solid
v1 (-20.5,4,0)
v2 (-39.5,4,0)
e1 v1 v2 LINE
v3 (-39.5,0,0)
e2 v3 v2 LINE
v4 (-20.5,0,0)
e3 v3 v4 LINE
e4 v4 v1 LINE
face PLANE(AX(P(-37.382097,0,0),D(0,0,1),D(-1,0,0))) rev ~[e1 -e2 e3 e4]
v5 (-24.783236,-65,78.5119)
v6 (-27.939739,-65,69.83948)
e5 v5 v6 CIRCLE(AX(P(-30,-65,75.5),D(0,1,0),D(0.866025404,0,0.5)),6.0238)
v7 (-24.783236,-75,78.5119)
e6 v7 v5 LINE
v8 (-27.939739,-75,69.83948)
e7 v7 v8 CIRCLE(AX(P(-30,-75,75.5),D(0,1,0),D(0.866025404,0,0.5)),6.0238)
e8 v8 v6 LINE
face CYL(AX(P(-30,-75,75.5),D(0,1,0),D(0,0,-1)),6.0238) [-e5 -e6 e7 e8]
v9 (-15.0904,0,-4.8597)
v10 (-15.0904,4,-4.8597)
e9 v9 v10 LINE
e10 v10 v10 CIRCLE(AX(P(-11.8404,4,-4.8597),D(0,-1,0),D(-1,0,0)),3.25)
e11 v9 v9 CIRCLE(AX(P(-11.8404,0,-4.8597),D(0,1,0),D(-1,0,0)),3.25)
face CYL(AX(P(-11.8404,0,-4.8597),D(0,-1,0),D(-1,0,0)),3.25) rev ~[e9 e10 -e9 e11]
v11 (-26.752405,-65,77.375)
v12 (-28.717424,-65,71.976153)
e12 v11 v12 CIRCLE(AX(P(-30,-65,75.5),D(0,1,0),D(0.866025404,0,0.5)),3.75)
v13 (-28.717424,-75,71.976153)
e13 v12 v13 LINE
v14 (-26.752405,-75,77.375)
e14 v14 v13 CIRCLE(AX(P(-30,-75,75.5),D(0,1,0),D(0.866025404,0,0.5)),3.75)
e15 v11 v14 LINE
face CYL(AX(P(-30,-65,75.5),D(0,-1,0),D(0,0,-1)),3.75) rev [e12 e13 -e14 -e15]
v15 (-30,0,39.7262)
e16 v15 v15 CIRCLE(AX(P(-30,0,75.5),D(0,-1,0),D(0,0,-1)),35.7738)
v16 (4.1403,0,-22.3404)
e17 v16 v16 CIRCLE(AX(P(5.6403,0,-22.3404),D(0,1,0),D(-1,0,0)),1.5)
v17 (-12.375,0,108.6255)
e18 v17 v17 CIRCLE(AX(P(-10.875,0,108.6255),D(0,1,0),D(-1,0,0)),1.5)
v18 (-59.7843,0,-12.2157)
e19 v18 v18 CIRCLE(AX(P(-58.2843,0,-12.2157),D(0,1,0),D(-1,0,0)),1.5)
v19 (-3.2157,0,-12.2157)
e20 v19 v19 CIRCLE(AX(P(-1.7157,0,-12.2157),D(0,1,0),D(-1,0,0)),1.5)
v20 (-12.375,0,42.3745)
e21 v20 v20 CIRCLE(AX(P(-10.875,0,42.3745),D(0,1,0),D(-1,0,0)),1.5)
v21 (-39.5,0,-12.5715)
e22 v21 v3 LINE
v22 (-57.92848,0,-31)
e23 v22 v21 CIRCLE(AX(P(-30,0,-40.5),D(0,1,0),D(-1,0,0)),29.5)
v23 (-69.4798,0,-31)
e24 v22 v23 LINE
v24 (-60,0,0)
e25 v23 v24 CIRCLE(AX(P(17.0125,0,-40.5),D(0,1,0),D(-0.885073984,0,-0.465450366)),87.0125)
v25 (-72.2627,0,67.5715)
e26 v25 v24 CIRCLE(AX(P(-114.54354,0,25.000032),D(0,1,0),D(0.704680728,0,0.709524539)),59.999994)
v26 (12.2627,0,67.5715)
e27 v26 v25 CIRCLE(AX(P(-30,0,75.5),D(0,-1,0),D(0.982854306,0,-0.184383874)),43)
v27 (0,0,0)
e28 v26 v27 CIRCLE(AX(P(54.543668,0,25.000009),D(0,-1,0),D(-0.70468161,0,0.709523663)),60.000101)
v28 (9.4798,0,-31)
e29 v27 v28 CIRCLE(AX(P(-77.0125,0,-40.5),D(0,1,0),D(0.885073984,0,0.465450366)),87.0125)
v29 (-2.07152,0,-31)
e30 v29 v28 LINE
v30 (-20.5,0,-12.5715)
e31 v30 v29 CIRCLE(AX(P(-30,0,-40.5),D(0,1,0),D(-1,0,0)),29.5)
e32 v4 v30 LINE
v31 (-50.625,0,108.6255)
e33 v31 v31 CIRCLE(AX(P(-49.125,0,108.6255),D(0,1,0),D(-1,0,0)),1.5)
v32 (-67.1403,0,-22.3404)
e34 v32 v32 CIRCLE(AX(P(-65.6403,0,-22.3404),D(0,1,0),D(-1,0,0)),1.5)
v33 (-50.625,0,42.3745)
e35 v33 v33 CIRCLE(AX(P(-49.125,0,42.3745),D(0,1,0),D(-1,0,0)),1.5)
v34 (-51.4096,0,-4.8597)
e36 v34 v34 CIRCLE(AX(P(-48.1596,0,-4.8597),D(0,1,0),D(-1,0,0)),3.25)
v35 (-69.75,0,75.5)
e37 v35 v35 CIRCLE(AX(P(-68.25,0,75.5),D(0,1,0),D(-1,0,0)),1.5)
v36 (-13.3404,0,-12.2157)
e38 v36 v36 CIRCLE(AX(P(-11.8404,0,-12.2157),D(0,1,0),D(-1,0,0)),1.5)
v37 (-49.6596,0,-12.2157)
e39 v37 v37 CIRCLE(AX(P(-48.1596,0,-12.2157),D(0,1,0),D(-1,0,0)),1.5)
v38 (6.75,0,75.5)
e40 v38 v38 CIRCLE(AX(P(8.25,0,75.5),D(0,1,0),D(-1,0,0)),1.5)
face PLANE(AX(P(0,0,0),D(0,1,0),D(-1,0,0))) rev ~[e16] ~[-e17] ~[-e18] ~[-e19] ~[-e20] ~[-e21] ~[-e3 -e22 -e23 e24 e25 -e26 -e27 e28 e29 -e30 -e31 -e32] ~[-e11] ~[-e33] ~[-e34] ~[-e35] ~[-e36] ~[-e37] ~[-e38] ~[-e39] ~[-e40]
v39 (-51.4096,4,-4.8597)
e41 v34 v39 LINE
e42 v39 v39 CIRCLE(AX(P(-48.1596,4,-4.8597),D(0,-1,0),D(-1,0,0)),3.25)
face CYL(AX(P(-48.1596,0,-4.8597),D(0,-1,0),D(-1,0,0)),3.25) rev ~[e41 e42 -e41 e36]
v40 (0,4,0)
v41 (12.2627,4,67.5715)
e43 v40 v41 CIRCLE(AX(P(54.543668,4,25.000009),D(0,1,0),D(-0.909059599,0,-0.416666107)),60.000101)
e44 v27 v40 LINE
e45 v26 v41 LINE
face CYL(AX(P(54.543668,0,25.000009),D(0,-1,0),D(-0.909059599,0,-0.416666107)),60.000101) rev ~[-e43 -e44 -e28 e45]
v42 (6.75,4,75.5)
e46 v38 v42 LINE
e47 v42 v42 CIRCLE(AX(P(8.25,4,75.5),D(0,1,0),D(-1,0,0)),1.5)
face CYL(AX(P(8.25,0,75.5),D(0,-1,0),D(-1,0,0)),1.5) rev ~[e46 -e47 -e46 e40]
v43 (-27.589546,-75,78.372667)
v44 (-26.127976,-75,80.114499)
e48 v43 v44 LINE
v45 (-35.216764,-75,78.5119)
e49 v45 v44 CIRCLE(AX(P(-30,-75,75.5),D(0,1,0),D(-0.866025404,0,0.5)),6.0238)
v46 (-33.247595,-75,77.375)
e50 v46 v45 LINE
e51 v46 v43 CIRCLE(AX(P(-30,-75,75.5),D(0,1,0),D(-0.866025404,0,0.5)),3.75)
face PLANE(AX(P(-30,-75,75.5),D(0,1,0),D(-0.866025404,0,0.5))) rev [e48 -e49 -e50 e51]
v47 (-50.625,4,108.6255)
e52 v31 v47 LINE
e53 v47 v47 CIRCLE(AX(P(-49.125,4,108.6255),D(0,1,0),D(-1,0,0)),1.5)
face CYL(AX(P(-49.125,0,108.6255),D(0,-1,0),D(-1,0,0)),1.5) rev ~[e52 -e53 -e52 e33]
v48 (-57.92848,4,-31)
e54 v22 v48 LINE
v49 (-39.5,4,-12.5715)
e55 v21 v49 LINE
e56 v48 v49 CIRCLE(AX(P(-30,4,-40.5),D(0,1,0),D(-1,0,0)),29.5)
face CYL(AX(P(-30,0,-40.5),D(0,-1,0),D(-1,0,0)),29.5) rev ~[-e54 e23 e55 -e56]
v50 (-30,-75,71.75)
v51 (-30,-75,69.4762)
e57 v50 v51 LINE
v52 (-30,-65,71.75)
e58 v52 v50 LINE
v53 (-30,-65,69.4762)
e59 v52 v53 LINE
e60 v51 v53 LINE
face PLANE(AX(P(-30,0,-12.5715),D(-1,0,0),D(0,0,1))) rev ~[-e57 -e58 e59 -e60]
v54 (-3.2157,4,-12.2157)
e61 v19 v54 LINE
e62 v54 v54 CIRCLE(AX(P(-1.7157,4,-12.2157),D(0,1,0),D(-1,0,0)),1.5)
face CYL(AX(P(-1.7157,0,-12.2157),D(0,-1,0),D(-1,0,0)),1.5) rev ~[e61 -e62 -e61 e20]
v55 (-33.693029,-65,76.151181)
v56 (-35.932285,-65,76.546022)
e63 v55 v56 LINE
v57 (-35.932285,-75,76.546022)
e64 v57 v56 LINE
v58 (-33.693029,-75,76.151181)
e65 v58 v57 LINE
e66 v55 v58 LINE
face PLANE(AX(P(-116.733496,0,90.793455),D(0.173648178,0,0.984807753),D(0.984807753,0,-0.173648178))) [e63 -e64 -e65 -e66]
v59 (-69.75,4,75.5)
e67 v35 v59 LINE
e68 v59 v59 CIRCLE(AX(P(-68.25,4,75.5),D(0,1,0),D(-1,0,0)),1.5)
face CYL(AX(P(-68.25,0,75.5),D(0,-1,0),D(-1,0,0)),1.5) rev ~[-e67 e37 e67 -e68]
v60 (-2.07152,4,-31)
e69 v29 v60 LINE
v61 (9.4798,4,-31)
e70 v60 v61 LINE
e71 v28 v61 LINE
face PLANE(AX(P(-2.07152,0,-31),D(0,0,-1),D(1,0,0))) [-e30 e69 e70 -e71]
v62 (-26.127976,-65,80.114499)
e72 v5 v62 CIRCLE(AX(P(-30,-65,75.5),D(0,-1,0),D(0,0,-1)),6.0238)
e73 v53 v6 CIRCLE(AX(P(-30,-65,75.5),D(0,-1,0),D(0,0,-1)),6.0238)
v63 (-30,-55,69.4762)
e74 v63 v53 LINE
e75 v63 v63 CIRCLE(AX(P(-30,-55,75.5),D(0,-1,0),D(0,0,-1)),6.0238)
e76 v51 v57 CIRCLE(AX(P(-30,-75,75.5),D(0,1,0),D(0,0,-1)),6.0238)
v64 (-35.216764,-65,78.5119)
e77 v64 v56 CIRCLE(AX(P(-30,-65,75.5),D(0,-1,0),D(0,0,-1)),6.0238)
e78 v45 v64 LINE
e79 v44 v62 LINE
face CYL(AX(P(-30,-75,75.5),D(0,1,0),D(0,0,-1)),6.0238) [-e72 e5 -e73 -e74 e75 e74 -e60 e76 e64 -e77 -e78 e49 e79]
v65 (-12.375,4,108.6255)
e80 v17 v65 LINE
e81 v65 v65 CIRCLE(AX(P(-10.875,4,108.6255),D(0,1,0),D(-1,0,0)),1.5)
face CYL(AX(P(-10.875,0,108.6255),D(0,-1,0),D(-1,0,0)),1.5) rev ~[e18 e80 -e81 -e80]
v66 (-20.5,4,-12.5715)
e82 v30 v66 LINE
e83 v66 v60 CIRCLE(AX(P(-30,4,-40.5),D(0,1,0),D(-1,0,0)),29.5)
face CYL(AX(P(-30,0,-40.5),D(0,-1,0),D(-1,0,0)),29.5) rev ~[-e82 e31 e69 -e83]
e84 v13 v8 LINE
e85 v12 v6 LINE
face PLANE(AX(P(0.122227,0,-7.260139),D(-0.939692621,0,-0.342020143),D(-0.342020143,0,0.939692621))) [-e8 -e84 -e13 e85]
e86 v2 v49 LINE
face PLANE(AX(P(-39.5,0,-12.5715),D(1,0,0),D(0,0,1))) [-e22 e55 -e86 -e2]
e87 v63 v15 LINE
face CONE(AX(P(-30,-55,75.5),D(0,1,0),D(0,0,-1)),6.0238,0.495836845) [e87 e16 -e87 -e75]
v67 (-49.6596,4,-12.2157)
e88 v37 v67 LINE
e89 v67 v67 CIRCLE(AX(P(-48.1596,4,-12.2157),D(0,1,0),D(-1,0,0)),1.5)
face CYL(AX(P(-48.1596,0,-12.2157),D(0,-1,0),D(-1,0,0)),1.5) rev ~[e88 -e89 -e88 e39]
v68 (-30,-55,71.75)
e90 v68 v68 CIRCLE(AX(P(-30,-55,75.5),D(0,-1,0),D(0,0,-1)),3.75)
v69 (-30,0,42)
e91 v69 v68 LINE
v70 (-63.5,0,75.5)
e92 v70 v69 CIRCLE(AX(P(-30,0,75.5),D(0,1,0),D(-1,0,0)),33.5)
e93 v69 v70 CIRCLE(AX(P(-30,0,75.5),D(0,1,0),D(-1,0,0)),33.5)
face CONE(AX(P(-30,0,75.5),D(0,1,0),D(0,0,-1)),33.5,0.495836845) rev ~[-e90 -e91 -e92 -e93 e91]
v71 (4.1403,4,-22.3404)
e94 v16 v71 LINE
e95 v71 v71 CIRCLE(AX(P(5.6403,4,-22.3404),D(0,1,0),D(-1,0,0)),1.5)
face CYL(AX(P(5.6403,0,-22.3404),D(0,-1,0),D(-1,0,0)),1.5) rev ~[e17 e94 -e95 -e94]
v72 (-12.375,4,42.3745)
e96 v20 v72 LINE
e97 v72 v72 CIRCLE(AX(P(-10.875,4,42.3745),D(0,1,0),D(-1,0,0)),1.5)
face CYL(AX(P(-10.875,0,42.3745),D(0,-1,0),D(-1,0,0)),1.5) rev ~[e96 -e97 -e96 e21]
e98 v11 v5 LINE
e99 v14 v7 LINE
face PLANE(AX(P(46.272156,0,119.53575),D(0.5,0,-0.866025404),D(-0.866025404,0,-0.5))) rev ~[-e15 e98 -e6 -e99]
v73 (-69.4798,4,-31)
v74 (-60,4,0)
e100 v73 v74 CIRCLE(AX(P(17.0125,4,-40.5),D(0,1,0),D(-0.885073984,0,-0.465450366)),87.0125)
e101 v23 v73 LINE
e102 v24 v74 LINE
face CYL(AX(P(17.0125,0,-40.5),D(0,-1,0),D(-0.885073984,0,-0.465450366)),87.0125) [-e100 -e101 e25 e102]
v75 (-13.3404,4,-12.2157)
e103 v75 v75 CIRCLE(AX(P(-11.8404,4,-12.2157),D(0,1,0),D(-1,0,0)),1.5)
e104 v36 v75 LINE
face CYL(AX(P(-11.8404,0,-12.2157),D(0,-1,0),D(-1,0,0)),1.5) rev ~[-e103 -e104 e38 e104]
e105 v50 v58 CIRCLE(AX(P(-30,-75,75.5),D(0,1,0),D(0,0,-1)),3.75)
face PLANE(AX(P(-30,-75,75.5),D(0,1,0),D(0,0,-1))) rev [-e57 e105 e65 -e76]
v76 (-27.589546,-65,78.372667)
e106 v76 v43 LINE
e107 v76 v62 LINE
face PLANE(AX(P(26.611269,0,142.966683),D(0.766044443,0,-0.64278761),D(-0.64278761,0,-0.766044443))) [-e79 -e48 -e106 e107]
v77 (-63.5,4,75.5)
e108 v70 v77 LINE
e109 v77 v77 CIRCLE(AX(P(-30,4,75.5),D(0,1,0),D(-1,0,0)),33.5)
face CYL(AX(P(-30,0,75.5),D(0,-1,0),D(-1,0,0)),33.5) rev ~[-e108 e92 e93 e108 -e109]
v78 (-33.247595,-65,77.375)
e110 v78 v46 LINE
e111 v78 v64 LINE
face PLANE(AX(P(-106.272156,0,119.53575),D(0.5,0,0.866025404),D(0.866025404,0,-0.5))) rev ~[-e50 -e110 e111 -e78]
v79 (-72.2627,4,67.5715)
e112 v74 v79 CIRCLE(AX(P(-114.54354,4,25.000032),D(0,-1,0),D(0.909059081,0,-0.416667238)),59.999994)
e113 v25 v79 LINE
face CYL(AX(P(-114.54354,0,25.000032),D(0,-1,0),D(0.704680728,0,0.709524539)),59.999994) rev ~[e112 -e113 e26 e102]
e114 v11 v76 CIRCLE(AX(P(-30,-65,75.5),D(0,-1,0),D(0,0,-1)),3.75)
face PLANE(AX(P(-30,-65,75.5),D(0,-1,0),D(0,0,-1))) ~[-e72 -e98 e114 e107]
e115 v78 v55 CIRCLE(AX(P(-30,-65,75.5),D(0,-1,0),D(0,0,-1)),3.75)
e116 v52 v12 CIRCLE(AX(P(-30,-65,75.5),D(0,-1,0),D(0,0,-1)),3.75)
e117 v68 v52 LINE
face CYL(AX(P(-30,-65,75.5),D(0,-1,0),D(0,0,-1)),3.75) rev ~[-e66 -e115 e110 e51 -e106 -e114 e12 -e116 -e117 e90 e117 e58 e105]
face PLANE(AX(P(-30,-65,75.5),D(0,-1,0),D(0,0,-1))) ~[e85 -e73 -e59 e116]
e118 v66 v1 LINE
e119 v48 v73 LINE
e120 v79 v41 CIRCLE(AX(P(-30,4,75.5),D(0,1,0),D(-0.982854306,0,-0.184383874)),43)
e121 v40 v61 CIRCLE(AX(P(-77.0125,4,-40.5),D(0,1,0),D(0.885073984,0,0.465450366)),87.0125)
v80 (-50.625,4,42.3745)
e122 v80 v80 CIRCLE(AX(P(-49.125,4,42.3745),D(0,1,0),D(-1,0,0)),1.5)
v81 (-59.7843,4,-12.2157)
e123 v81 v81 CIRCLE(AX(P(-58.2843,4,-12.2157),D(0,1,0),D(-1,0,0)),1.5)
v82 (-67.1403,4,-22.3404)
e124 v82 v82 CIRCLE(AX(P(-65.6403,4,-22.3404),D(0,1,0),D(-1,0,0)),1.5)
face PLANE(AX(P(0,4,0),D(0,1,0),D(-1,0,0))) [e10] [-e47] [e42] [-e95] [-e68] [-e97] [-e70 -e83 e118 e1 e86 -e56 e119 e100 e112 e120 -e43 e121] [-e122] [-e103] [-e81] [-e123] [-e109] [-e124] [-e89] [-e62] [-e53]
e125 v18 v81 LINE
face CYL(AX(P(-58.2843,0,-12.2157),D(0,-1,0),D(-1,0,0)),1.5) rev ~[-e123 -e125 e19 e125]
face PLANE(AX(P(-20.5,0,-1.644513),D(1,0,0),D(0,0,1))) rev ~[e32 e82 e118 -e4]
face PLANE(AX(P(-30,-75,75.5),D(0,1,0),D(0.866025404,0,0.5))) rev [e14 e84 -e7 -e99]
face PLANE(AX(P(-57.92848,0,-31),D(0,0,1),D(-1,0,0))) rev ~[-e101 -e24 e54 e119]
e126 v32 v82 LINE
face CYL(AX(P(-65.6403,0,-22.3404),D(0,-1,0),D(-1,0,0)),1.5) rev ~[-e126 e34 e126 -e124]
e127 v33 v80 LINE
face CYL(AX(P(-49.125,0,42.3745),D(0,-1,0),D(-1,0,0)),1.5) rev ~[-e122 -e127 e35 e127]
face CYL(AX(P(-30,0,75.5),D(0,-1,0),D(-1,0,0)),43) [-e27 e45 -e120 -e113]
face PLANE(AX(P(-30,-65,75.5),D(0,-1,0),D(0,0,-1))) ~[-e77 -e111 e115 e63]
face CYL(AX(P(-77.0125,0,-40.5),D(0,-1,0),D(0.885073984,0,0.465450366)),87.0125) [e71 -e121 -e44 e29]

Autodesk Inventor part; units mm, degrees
ref_plane "YZ Plane" through (0, 0, 0) normal (1, 0, 0) x (0, 1, 0)
ref_plane "XZ Plane" through (0, 0, 0) normal (0, 1, 0) x (-1, 0, 0)
ref_plane "XY Plane" through (0, 0, 0) normal (0, 0, 1) x (1, 0, 0)
sketch "Sketch1" plane through (0, 0, 0) normal (0, 1, 0) x (-1, 0, 0)
  line L0 (0, 0) -> (60, 0)
  line L1 (60, -81) -> (0, -81)
  line L2 (0, -81) -> (0, -40.5)
  line L3 (44.9096, -21.5055) -> (14.9096, -21.5055) construction
  line L4 (44.9096, -81) -> (44.9096, 0) construction
  line L5 (14.9096, 0) -> (14.9096, -81) construction
  circle A0 centre (39.9096, -73.5) radius 1.5
  circle A1 centre (39.9096, -7.5) radius 1.5
  circle A2 centre (19.9096, -7.5) radius 1.5
  circle A3 centre (19.9096, -73.5) radius 1.5
  line L6 (60, -40.5) -> (0, -40.5) construction
  line L7 (30, 0) -> (30, -81) construction
  circle A4 centre (30, -40.5) radius 24
  circle A5 centre (30, -40.5) radius 27.5
  circle A6 centre (57.1293, -36) radius 1.5
  circle A7 centre (57.1293, -45) radius 1.5
  circle A8 centre (25.5, -13.3707) radius 1.5
  circle A9 centre (34.5, -13.3707) radius 1.5
  circle A10 centre (2.8707, -45) radius 1.5
  circle A11 centre (2.8707, -36) radius 1.5
  circle A12 centre (34.5, -67.6293) radius 1.5
  circle A13 centre (25.5, -67.6293) radius 1.5
  arc A14 (60, -81) -> (60, 0) centre (-17.0125, -40.5) ccw
  arc A15 (-5.7831, -34.5157) -> (14.9096, -7.5073) centre (30, -40.5) ccw construction
  circle A16 centre (65.9998, -36) radius 1.5
  circle A17 centre (65.9998, -45) radius 1.5
  circle A18 centre (-5.9998, -45) radius 1.5
  circle A19 centre (-5.9998, -36) radius 1.5
  arc A20 (0, 0) -> (0, -81) centre (77.0125, -40.5) ccw
  line L8 (30, -40.5) -> (-3.3536, -73.8536) construction
  circle A21 centre (1.7157, -68.7843) radius 1.5
  circle A22 centre (11.8404, -76.1403) radius 1.5
  circle A23 centre (23.7426, -80.0075) radius 1.5
  circle A24 centre (36.2574, -80.0075) radius 1.5
  circle A25 centre (48.1596, -76.1403) radius 1.5
  circle A26 centre (58.2843, -68.7843) radius 1.5
  circle A27 centre (65.6403, -58.6596) radius 1.5
  circle A28 centre (69.5075, -46.7574) radius 1.5
  circle A29 centre (69.5075, -34.2426) radius 1.5
  circle A30 centre (65.6403, -22.3404) radius 1.5
  circle A31 centre (58.2843, -12.2157) radius 1.5
  circle A32 centre (48.1596, -4.8597) radius 1.5
  circle A33 centre (36.2574, -0.9925) radius 1.5
  circle A34 centre (23.7426, -0.9925) radius 1.5
  circle A35 centre (11.8404, -4.8597) radius 1.5
  circle A36 centre (1.7157, -12.2157) radius 1.5
  circle A37 centre (-5.6403, -22.3404) radius 1.5
  circle A38 centre (-9.5075, -34.2426) radius 1.5
  circle A39 centre (-9.5075, -46.7574) radius 1.5
  circle A40 centre (-5.6403, -58.6596) radius 1.5
  circle A41 centre (48.1596, -68.7843) radius 1.5
  circle A42 centre (48.1596, -12.2157) radius 1.5
  circle A43 centre (11.8404, -12.2157) radius 1.5
  circle A44 centre (11.8404, -68.7843) radius 1.5
  line L9 (56.4575, -33) -> (69.2906, -33)
  line L10 (37.5, -1.2094) -> (37.5, -14.0425)
  line L11 (37.5, -1.2094) -> (37.5, -14.0425)
  circle A45 centre (30, -40.5) radius 27.5
  line L12 (30, -81) -> (30, -0.5) construction
  line L13 (60, -33) -> (60, -81)
  arc A46 (60, -14.0425) -> (59.3249, -13.2961) centre (30, -40.5) ccw construction
  line L14 (55.807, -31) -> (69.4798, -31)
  circle A47 centre (48.1596, -4.8597) radius 3.25
  line L15 (51.4096, -4.8597) -> (51.4096, 0)
  line L16 (44.9096, -4.8597) -> (44.9096, 0)
  circle A48 centre (30, -40.5) radius 29.5
  line L17 (39.5, -12.5715) -> (39.5, 0)
  circle A49 centre (30, 75.5) radius 33.5
  line L18 (148.361, 0) -> (-88.361, 0) projected
  circle A50 centre (30, 75.5) radius 43
  arc A51 (37.7343, -1.2549) -> (13.1894, -4.2039) centre (30, -40.5) ccw
  arc A52 (-9.2451, -32.7657) -> (69.2451, -32.7657) centre (30, -40.5) ccw
  arc A53 (-9.2451, -32.7657) -> (69.2451, -32.7657) centre (30, -40.5) ccw construction
  arc A54 (37.7343, -1.2549) -> (13.1894, -4.2039) centre (30, -40.5) ccw construction
  line L19 (63.5, 75.5) -> (73, 75.5) construction
  circle A55 centre (68.25, 75.5) radius 1.5
  circle A56 centre (49.125, 108.6255) radius 1.5
  circle A57 centre (10.875, 108.6255) radius 1.5
  circle A58 centre (-8.25, 75.5) radius 1.5
  circle A59 centre (10.875, 42.3745) radius 1.5
  circle A60 centre (49.125, 42.3745) radius 1.5
  line L20 (4.193, -31) -> (-9.4798, -31)
  circle A61 centre (11.8404, -4.8597) radius 3.25
  line L21 (20.5, -12.5715) -> (20.5, 0)
  arc A62 (0, 0) -> (-12.2627, 67.5715) centre (-54.5436, 25) ccw
  arc A63 (72.2627, 67.5715) -> (60, 0) centre (114.5436, 25) ccw
  point P0 (29.9096, -21.5055)
  point P1 (30, -40.75)
  point P2 (-7.9036, 55.1945)
  point P3 (57.9285, -31)
  point P4 (2.0715, -31)
  point P5 (72.2627, 67.5715)
  point P6 (2.984, 42.0465)
  point P7 (57.016, 42.0465)
  dimension "d48" = 67
  dimension "d52" = 42
  dimension "d6" = 60
  dimension "d7" = 81
  dimension "d8" = 3
  dimension "d9" = 7.5
  dimension "d10" = 5
  dimension "d11" = 30
  dimension "d12" = 3
  dimension "d13" = 7.5
  dimension "d14" = 5
  dimension "d15" = 3
  dimension "d16" = 3
  dimension "d17" = 5
  dimension "d18" = 48
  dimension "d19" = 55
  dimension "d20" = 3
  dimension "d21" = 4.5
  dimension "d22" = 3
  dimension "d23" = 4.5
  dimension "d24" = 360
  dimension "d26" = 72.56
  dimension "d27" = 3
  dimension "d28" = 3
  dimension "d29" = 360
  dimension "d30" = 45
  dimension "d31" = 3
  dimension "d32" = 360
  dimension "d33" = 3
  dimension "d34" = 3
  dimension "d35" = 3
  dimension "d36" = 3
  dimension "d37" = 55
  dimension "d39" = 90
  dimension "d42" = 12.8331
  dimension "d43" = 12.8331
  dimension "d44" = 2
  dimension "d45" = 6.5
  dimension "d46" = 2
  dimension "d47" = 2
  dimension "d49" = 30
  dimension "d57" = 3
  dimension "d60" = 360
  dimension "d84" = 4.75
  dimension "d85" = 60
  dimension "d86" = 25
extrude "Extrusion1" add sketch "Sketch1" along normal blind 4 contours A62 A50 A63 L0 A33 A34 | L0 L21 A2 A48 L20 A20 | A62 A50 A63 | A34 L0 | L21 A2 | A14 L14 A48 L17 A1 L0 L16 A47 L15 | A33 L0 | L15 A47 L16 L0 | L17 A1 picked at (20.0279, -7.9174) picked at (39.7286, -7.0086)
ref_plane "Work Plane1" through (-30, 0, -12.5715) normal (-1, 0, 0) x (0, 0, 1)
sketch "Sketch3" plane through (-30, 0, -12.5715) normal (-1, 0, 0) x (0, 0, 1)
  line L0 (54.5715, 0) -> (84.3215, -55)
  line L1 (54.5715, 0) -> (121.5715, 0) projected
  line L2 (121.5715, 0) -> (54.5715, 0)
  line L3 (54.5715, 4) -> (121.5715, 4) projected
  line L4 (88.0715, 4) -> (88.0715, -55)
  line L5 (84.3215, -55) -> (82.0477, -55)
  line L6 (82.0477, -55) -> (52.2977, 0)
  line L7 (52.2977, 0) -> (54.5715, 0)
  line L8 (84.3215, -55) -> (84.3215, -65)
  line L9 (82.0477, -55) -> (82.0477, -65)
  line L10 (84.3215, -65) -> (82.0477, -65)
  line L11 (84.3215, -65) -> (84.3215, -75)
  line L12 (84.3215, -75) -> (82.0477, -75)
  line L13 (82.0477, -75) -> (82.0477, -65)
  point P0 (12.5715, 0)
  point P1 (88.0715, 0)
  dimension "d88" = 59
  dimension "d89" = 3.75
  dimension "d94" = 10
  dimension "d96" = 2.2738
  dimension "d98" = 10
revolve "Revolution4" add sketch "Sketch3" angle 360 about axis through (-30, 4, 75.5) along (0, -1, 0) contours L0 L5 L6 L7 | L8 L10 L9 L5
revolve "Revolution5" add sketch "Sketch3" angle 100 about axis through (-30, 4, 75.5) along (0, 1, 0) contours L11 L12 L13 L10
pattern_circular "Circular Pattern3" count 3 over 360 about axis through (-30, -60, 75.5) along (0, 1, 0) of "Revolution5"
equation "\"d11\" = 0.5 * d6"
equation "\"d12\" = d8"
equation "\"d15\" = d8"
equation "\"d16\" = d8"
equation "\"d22\" = d8"
equation "\"d27\" = d8"
equation "\"d28\" = d8"
equation "\"d31\" = d8"
equation "\"d33\" = d8"
equation "\"d34\" = d8"
equation "\"d35\" = d8"
equation "\"d36\" = d8"
properties part number "OneLensHolder"
